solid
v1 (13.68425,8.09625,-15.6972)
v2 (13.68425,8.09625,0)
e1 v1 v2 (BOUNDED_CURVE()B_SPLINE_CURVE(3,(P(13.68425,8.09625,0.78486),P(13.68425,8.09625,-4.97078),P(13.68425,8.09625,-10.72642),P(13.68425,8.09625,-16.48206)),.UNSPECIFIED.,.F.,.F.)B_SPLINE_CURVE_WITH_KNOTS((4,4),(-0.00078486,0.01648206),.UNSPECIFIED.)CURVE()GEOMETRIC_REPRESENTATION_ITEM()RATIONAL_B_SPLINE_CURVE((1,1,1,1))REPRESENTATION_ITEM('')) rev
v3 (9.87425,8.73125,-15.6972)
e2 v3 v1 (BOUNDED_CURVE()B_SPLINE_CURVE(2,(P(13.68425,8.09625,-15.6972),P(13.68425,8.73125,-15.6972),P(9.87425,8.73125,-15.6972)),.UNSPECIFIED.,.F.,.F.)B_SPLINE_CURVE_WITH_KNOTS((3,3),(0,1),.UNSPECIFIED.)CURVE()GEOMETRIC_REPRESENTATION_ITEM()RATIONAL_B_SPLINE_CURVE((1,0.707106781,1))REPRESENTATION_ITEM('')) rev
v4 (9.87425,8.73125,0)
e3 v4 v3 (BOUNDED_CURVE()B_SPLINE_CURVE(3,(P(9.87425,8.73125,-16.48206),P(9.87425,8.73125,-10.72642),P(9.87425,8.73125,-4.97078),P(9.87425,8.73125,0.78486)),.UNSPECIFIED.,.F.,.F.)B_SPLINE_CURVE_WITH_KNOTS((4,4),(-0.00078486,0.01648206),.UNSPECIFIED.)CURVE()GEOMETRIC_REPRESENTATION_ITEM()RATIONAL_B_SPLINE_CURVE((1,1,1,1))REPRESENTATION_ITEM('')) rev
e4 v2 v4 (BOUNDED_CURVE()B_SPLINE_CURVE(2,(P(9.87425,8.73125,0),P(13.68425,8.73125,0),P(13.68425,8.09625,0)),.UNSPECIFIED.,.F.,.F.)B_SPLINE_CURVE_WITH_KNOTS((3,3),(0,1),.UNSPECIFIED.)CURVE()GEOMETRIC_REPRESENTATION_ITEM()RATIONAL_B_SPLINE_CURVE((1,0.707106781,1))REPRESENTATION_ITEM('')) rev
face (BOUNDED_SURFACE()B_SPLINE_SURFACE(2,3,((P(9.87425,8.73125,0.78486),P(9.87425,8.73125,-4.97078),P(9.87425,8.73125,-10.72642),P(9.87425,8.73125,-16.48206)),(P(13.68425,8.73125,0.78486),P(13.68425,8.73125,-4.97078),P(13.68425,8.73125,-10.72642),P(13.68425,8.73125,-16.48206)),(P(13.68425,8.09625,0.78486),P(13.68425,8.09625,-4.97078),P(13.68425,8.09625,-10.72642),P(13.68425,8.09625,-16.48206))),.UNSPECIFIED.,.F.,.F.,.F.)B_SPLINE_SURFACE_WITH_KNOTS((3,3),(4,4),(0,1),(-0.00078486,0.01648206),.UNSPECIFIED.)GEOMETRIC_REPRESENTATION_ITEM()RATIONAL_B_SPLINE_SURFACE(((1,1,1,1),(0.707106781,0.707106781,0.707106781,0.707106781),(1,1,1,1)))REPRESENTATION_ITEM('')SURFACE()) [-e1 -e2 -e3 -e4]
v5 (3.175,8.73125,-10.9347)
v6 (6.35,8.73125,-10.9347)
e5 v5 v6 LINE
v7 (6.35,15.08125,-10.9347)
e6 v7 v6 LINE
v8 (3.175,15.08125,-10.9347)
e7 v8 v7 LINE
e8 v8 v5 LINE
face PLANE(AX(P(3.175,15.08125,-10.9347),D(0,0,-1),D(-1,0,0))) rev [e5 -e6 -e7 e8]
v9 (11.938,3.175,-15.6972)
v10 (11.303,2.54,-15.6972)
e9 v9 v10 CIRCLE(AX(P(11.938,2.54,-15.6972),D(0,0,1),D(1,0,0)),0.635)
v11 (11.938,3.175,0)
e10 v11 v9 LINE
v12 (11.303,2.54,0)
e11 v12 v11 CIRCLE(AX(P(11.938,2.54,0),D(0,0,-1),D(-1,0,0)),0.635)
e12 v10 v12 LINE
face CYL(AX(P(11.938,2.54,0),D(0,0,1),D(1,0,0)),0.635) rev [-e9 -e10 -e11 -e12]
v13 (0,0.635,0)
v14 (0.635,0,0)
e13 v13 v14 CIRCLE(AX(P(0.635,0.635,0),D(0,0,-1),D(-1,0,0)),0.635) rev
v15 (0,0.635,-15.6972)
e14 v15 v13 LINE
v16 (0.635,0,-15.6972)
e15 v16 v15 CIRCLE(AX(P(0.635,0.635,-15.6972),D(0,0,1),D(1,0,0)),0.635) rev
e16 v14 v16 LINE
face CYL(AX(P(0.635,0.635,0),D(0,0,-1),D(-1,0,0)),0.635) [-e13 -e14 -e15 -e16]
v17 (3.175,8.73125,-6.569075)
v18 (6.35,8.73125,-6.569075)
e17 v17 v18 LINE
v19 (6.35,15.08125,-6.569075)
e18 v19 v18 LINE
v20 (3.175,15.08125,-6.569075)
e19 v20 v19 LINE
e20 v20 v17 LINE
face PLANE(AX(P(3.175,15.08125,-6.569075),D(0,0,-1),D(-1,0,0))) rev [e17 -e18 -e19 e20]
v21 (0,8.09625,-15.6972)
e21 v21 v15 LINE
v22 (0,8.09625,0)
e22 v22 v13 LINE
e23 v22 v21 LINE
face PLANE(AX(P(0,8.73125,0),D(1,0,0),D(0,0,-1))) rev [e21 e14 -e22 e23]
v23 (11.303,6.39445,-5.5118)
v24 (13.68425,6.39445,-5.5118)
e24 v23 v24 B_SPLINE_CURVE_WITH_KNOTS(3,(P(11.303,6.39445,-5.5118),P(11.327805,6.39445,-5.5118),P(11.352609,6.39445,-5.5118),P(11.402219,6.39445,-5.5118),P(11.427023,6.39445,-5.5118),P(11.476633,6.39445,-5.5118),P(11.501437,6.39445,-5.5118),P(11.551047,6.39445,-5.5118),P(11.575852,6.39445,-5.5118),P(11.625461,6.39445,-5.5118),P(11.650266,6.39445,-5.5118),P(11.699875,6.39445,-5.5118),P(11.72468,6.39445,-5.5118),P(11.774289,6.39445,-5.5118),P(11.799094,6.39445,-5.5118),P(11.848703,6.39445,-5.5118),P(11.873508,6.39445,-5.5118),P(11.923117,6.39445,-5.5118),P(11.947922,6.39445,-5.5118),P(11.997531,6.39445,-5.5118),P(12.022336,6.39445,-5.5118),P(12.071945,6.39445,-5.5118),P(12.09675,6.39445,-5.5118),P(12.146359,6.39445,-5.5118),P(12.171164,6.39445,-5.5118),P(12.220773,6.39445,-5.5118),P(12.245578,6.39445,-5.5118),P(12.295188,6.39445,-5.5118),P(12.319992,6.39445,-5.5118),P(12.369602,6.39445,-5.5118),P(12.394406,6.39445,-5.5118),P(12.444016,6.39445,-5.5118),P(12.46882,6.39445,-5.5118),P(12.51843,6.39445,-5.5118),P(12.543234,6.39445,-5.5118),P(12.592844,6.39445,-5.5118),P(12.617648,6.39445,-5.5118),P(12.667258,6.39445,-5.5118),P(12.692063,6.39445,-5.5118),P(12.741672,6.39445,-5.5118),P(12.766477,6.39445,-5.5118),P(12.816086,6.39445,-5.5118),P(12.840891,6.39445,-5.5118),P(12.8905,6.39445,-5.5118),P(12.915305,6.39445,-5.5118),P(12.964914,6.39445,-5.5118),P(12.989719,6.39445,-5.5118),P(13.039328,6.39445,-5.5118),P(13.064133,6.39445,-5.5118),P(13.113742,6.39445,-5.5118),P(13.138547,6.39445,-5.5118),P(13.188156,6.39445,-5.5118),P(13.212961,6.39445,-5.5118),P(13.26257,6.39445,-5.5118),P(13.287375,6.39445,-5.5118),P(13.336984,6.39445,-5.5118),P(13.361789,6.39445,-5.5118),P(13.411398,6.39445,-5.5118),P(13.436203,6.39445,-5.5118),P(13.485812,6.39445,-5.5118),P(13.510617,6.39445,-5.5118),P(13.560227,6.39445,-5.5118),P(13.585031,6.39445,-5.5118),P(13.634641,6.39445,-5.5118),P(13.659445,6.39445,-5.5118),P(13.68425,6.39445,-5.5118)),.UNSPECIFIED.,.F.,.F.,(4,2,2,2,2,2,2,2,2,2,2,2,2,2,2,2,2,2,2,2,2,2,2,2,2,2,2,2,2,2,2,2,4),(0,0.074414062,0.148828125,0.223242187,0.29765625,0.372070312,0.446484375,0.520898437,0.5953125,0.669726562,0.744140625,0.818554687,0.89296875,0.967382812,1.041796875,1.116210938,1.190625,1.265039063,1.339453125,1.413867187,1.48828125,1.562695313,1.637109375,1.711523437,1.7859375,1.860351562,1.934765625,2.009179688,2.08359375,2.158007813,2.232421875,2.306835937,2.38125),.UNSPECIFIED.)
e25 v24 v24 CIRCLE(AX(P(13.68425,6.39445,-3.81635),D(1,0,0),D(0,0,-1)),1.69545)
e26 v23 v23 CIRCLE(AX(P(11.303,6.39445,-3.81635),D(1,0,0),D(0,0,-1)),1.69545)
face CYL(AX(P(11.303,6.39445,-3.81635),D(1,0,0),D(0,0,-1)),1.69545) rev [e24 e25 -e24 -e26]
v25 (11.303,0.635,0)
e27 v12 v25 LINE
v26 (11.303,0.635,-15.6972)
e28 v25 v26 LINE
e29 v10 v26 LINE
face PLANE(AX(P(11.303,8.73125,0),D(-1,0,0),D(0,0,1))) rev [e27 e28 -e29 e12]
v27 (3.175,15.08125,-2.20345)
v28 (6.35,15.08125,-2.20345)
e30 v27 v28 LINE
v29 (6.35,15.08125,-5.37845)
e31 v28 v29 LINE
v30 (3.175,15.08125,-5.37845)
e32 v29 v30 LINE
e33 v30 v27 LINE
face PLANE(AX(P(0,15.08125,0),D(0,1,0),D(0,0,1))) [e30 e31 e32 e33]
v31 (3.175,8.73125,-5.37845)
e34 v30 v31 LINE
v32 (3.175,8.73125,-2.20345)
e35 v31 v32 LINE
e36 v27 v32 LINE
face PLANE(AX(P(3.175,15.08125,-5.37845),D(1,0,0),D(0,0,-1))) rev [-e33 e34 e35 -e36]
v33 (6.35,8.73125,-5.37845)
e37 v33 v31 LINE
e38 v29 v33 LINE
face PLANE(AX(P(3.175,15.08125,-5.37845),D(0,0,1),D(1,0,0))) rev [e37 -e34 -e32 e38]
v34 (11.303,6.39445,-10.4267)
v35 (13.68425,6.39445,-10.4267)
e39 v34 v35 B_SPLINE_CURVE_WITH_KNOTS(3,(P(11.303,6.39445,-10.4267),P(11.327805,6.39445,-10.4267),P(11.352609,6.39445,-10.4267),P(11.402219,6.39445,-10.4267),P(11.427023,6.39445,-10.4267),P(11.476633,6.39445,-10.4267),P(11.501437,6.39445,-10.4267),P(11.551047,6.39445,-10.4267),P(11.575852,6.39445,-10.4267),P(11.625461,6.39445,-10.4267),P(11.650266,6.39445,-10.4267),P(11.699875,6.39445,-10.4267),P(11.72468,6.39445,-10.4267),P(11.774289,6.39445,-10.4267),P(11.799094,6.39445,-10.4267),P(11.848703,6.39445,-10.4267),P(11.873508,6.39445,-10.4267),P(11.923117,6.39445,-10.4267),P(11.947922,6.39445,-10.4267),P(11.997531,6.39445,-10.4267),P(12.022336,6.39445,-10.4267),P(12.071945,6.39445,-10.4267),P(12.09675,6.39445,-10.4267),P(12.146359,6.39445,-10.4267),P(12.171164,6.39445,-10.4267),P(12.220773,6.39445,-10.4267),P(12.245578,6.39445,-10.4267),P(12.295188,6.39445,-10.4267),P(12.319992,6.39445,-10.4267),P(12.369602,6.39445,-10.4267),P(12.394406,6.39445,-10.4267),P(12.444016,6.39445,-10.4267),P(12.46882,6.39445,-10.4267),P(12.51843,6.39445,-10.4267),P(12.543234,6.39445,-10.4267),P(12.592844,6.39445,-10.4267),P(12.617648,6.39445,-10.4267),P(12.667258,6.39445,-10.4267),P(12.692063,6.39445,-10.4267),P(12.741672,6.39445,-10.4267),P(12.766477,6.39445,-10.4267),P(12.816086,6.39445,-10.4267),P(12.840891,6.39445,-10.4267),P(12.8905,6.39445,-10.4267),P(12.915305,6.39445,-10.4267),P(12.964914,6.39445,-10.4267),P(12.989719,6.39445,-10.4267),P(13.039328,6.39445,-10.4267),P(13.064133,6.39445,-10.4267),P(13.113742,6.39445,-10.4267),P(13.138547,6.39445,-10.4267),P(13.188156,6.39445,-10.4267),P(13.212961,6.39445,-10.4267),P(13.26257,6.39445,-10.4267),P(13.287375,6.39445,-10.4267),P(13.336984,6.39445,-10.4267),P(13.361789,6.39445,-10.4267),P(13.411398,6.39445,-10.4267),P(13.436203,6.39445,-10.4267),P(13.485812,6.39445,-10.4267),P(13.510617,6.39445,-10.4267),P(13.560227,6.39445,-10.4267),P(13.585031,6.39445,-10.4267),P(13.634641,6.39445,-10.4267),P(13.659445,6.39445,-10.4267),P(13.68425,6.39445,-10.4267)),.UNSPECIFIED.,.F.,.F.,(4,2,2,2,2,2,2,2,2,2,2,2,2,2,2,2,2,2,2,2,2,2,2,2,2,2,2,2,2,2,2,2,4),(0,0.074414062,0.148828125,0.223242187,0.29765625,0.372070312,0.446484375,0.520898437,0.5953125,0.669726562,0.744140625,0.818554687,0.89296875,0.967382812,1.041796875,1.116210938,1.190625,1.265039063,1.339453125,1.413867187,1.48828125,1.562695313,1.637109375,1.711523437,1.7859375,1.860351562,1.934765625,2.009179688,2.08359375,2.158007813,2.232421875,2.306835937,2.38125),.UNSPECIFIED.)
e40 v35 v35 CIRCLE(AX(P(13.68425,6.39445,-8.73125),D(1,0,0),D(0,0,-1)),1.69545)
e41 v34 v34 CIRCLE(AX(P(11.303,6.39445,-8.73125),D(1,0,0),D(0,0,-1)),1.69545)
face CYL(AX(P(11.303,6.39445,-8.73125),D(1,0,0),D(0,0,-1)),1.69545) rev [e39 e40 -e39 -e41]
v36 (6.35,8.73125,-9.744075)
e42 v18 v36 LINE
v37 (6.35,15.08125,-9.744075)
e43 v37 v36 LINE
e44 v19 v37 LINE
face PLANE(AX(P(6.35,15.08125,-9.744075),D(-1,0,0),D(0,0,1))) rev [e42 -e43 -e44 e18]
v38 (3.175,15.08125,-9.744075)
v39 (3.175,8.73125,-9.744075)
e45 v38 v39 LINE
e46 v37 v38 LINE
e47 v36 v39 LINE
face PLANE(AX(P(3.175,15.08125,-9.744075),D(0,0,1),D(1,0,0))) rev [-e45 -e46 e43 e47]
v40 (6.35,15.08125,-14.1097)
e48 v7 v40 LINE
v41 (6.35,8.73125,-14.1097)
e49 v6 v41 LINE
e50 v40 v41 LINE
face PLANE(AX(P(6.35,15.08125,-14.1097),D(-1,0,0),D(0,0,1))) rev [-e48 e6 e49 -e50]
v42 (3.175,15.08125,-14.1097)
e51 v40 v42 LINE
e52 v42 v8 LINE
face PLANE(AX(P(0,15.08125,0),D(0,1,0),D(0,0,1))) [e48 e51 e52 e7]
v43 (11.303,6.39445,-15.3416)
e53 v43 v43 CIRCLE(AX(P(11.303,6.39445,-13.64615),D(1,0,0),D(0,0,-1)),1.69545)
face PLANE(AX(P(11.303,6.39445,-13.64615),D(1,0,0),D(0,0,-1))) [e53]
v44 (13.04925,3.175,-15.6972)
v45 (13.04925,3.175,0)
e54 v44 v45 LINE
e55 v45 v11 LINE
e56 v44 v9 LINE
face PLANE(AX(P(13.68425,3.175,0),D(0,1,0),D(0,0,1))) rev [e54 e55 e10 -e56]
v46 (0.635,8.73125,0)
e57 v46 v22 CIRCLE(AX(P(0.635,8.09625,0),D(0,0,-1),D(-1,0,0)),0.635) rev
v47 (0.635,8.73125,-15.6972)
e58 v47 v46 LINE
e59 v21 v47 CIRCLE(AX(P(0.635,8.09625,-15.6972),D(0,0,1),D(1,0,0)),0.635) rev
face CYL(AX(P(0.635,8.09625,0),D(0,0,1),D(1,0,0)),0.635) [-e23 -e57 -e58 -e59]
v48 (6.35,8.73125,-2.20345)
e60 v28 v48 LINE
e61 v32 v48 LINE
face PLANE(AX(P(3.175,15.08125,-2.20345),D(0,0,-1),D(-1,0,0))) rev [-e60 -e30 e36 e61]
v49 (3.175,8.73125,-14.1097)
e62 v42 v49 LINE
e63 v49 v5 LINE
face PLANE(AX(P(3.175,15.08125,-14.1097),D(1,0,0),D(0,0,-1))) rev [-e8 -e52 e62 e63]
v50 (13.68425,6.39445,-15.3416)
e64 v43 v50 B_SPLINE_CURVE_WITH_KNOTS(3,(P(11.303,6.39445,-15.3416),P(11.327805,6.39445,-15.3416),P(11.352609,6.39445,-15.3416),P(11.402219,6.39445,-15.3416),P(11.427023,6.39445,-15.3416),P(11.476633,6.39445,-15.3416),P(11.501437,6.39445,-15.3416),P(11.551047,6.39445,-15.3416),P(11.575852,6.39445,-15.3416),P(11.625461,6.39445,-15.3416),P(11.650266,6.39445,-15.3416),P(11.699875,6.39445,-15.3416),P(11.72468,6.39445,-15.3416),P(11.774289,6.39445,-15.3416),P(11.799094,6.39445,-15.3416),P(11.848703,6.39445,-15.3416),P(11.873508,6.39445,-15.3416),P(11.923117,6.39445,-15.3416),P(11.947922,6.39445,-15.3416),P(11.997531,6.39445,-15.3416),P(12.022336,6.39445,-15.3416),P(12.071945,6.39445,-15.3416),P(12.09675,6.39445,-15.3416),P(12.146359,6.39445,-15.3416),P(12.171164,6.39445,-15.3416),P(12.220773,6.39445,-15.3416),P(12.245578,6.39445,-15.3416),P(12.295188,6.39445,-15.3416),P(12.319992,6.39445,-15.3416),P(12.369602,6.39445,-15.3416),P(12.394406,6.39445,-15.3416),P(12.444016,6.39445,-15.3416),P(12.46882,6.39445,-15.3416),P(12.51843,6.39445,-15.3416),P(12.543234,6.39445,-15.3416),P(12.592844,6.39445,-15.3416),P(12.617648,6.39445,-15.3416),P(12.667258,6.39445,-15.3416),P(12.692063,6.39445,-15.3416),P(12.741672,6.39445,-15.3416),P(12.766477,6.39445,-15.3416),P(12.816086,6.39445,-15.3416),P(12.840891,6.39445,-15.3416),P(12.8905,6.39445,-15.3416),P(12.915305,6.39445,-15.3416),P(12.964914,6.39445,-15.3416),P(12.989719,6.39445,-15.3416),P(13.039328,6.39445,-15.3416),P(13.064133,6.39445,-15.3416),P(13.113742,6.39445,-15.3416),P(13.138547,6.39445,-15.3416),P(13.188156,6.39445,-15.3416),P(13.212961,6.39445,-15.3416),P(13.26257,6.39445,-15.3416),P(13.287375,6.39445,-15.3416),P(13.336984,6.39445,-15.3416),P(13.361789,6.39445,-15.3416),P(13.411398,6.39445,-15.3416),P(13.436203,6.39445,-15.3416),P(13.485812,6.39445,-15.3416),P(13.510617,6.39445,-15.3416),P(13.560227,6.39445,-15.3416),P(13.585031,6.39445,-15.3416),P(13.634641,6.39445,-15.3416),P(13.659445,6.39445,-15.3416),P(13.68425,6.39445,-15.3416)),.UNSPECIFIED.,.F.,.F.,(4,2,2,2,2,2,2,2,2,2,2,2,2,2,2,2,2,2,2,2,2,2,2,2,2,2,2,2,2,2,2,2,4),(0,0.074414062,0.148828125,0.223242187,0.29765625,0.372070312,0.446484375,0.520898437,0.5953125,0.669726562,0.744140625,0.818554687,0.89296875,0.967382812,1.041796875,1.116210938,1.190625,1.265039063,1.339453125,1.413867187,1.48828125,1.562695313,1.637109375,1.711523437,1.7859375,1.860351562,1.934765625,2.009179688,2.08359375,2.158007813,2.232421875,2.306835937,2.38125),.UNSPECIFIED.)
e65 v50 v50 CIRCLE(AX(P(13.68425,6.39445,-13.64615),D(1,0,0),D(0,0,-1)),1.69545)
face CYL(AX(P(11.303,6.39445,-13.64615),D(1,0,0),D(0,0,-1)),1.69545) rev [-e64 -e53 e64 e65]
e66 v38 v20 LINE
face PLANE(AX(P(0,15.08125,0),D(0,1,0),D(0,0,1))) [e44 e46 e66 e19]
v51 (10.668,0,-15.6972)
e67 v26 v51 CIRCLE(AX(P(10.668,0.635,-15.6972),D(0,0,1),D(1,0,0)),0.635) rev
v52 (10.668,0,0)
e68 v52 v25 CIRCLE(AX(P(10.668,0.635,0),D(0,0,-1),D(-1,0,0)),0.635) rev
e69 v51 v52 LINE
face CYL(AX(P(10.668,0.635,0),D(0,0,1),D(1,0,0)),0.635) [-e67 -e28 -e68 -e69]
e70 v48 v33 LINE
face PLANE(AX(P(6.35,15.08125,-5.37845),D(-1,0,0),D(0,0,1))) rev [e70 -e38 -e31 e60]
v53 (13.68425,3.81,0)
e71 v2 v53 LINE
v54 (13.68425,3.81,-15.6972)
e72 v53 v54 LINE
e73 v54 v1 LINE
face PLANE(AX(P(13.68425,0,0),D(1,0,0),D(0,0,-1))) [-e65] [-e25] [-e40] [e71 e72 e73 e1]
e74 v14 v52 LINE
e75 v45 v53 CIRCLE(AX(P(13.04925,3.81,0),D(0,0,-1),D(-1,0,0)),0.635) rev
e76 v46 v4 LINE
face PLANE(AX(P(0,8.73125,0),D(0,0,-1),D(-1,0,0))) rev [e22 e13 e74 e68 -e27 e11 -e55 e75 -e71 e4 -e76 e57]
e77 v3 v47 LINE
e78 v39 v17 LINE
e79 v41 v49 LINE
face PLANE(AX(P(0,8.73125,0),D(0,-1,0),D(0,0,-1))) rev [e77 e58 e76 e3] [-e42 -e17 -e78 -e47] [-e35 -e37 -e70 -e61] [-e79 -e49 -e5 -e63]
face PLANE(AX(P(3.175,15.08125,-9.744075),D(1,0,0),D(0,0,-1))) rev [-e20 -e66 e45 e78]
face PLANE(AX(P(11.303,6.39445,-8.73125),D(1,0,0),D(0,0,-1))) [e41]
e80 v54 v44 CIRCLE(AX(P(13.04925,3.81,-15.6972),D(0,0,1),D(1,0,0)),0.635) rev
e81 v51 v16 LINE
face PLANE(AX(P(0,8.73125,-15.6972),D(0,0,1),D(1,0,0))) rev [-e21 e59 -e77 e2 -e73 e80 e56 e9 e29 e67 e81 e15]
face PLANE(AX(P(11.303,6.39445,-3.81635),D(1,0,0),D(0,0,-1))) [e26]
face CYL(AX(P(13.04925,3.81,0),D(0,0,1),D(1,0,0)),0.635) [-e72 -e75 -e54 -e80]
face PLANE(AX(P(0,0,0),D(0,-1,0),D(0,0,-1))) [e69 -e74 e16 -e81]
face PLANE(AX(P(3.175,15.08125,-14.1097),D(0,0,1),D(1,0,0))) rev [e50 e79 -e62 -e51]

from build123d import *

# Parameters (mm, degrees)
SKETCH1_W           = 11.303
SKETCH1_H           = 15.6972
BOSS_EXTRUDE1_DEPTH = 8.73125
SKETCH2_W           = 15.6972
SKETCH2_H           = 5.55625
BOSS_EXTRUDE2_DEPTH = 2.38125
FILLET1_R           = 0.635
SKETCH5_R           = 1.69545
CUT_EXTRUDE1_DEPTH  = 2.38125
SKETCH7_W           = 3.175
SKETCH7_H           = 3.175
BOSS_EXTRUDE3_DEPTH = 6.35
FILLET2_SIZE        = 0.635
FILLET2_SIZE_2      = 3.81
FILLET3_R           = 0.635


with BuildPart() as part:
    # Sketch1 → Boss-Extrude1 (new body)
    with BuildSketch(Plane(origin=(0, 0, 0), x_dir=(1, 0, 0), z_dir=(0, 1, 0))):
        with Locations((5.6515, 7.8486)):
            Rectangle(SKETCH1_W, SKETCH1_H)
    extrude(amount=BOSS_EXTRUDE1_DEPTH)

    # Sketch2 → Boss-Extrude2 (add)
    with BuildSketch(Plane(origin=(11.303, 0, 0), x_dir=(0, 0, -1), z_dir=(1, 0, 0))):
        with Locations((7.8486, 5.953125)):
            Rectangle(SKETCH2_W, SKETCH2_H)
    extrude(amount=BOSS_EXTRUDE2_DEPTH)

    # Fillet1
    fillet1_edges = [part.edges().sort_by_distance(p)[0] for p in [
        (13.68425, 3.175, -7.8486),
    ]]
    fillet(fillet1_edges, radius=FILLET1_R)

    # Sketch5 → Cut-Extrude1 (cut)
    with BuildSketch(Plane(origin=(13.68425, 0, 0), x_dir=(0, 0, -1), z_dir=(1, 0, 0))):
        with Locations((13.64615, 6.39445)):
            Circle(SKETCH5_R)
        with Locations((8.73125, 6.39445)):
            Circle(SKETCH5_R)
        with Locations((3.81635, 6.39445)):
            Circle(SKETCH5_R)
    extrude(amount=-CUT_EXTRUDE1_DEPTH, mode=Mode.SUBTRACT)

    # Sketch7 → Boss-Extrude3 (add)
    with BuildSketch(Plane(origin=(0, 8.73125, 0), x_dir=(1, 0, 0), z_dir=(0, 1, 0))):
        with Locations((4.7625, 3.79095)):
            Rectangle(SKETCH7_W, SKETCH7_H)
        with Locations((4.7625, 12.5222)):
            Rectangle(SKETCH7_W, SKETCH7_H)
        with Locations((4.7625, 8.156575)):
            Rectangle(SKETCH7_W, SKETCH7_H)
    extrude(amount=BOSS_EXTRUDE3_DEPTH)

    # Fillet2
    # an asymmetric fillet: 3.81, 0.635 mm, written as the material it takes off along each edge
    with BuildSketch(Plane(origin=(13.68425, 8.73125, 9.525), x_dir=(0, -1, 0), z_dir=(0, 0, -1))) as fillet2_piece_1:
        with BuildLine():
            Bezier((FILLET2_SIZE, 0), (0, 0), (0, FILLET2_SIZE_2), weights=[1, 0.707106781, 1])
            Line((0, FILLET2_SIZE_2), (0, 0))
            Line((0, 0), (FILLET2_SIZE, 0))
        make_face()
    extrude(amount=34.7472, mode=Mode.SUBTRACT)

    # Fillet3
    fillet3_edges = [part.edges().sort_by_distance(p)[0] for p in [
        (11.303, 3.175, -7.8486),
        (11.303, 0, -7.8486),
        (0, 0, -7.8486),
        (0, 8.73125, -7.8486),
    ]]
    fillet(fillet3_edges, radius=FILLET3_R)


solid = part.part
